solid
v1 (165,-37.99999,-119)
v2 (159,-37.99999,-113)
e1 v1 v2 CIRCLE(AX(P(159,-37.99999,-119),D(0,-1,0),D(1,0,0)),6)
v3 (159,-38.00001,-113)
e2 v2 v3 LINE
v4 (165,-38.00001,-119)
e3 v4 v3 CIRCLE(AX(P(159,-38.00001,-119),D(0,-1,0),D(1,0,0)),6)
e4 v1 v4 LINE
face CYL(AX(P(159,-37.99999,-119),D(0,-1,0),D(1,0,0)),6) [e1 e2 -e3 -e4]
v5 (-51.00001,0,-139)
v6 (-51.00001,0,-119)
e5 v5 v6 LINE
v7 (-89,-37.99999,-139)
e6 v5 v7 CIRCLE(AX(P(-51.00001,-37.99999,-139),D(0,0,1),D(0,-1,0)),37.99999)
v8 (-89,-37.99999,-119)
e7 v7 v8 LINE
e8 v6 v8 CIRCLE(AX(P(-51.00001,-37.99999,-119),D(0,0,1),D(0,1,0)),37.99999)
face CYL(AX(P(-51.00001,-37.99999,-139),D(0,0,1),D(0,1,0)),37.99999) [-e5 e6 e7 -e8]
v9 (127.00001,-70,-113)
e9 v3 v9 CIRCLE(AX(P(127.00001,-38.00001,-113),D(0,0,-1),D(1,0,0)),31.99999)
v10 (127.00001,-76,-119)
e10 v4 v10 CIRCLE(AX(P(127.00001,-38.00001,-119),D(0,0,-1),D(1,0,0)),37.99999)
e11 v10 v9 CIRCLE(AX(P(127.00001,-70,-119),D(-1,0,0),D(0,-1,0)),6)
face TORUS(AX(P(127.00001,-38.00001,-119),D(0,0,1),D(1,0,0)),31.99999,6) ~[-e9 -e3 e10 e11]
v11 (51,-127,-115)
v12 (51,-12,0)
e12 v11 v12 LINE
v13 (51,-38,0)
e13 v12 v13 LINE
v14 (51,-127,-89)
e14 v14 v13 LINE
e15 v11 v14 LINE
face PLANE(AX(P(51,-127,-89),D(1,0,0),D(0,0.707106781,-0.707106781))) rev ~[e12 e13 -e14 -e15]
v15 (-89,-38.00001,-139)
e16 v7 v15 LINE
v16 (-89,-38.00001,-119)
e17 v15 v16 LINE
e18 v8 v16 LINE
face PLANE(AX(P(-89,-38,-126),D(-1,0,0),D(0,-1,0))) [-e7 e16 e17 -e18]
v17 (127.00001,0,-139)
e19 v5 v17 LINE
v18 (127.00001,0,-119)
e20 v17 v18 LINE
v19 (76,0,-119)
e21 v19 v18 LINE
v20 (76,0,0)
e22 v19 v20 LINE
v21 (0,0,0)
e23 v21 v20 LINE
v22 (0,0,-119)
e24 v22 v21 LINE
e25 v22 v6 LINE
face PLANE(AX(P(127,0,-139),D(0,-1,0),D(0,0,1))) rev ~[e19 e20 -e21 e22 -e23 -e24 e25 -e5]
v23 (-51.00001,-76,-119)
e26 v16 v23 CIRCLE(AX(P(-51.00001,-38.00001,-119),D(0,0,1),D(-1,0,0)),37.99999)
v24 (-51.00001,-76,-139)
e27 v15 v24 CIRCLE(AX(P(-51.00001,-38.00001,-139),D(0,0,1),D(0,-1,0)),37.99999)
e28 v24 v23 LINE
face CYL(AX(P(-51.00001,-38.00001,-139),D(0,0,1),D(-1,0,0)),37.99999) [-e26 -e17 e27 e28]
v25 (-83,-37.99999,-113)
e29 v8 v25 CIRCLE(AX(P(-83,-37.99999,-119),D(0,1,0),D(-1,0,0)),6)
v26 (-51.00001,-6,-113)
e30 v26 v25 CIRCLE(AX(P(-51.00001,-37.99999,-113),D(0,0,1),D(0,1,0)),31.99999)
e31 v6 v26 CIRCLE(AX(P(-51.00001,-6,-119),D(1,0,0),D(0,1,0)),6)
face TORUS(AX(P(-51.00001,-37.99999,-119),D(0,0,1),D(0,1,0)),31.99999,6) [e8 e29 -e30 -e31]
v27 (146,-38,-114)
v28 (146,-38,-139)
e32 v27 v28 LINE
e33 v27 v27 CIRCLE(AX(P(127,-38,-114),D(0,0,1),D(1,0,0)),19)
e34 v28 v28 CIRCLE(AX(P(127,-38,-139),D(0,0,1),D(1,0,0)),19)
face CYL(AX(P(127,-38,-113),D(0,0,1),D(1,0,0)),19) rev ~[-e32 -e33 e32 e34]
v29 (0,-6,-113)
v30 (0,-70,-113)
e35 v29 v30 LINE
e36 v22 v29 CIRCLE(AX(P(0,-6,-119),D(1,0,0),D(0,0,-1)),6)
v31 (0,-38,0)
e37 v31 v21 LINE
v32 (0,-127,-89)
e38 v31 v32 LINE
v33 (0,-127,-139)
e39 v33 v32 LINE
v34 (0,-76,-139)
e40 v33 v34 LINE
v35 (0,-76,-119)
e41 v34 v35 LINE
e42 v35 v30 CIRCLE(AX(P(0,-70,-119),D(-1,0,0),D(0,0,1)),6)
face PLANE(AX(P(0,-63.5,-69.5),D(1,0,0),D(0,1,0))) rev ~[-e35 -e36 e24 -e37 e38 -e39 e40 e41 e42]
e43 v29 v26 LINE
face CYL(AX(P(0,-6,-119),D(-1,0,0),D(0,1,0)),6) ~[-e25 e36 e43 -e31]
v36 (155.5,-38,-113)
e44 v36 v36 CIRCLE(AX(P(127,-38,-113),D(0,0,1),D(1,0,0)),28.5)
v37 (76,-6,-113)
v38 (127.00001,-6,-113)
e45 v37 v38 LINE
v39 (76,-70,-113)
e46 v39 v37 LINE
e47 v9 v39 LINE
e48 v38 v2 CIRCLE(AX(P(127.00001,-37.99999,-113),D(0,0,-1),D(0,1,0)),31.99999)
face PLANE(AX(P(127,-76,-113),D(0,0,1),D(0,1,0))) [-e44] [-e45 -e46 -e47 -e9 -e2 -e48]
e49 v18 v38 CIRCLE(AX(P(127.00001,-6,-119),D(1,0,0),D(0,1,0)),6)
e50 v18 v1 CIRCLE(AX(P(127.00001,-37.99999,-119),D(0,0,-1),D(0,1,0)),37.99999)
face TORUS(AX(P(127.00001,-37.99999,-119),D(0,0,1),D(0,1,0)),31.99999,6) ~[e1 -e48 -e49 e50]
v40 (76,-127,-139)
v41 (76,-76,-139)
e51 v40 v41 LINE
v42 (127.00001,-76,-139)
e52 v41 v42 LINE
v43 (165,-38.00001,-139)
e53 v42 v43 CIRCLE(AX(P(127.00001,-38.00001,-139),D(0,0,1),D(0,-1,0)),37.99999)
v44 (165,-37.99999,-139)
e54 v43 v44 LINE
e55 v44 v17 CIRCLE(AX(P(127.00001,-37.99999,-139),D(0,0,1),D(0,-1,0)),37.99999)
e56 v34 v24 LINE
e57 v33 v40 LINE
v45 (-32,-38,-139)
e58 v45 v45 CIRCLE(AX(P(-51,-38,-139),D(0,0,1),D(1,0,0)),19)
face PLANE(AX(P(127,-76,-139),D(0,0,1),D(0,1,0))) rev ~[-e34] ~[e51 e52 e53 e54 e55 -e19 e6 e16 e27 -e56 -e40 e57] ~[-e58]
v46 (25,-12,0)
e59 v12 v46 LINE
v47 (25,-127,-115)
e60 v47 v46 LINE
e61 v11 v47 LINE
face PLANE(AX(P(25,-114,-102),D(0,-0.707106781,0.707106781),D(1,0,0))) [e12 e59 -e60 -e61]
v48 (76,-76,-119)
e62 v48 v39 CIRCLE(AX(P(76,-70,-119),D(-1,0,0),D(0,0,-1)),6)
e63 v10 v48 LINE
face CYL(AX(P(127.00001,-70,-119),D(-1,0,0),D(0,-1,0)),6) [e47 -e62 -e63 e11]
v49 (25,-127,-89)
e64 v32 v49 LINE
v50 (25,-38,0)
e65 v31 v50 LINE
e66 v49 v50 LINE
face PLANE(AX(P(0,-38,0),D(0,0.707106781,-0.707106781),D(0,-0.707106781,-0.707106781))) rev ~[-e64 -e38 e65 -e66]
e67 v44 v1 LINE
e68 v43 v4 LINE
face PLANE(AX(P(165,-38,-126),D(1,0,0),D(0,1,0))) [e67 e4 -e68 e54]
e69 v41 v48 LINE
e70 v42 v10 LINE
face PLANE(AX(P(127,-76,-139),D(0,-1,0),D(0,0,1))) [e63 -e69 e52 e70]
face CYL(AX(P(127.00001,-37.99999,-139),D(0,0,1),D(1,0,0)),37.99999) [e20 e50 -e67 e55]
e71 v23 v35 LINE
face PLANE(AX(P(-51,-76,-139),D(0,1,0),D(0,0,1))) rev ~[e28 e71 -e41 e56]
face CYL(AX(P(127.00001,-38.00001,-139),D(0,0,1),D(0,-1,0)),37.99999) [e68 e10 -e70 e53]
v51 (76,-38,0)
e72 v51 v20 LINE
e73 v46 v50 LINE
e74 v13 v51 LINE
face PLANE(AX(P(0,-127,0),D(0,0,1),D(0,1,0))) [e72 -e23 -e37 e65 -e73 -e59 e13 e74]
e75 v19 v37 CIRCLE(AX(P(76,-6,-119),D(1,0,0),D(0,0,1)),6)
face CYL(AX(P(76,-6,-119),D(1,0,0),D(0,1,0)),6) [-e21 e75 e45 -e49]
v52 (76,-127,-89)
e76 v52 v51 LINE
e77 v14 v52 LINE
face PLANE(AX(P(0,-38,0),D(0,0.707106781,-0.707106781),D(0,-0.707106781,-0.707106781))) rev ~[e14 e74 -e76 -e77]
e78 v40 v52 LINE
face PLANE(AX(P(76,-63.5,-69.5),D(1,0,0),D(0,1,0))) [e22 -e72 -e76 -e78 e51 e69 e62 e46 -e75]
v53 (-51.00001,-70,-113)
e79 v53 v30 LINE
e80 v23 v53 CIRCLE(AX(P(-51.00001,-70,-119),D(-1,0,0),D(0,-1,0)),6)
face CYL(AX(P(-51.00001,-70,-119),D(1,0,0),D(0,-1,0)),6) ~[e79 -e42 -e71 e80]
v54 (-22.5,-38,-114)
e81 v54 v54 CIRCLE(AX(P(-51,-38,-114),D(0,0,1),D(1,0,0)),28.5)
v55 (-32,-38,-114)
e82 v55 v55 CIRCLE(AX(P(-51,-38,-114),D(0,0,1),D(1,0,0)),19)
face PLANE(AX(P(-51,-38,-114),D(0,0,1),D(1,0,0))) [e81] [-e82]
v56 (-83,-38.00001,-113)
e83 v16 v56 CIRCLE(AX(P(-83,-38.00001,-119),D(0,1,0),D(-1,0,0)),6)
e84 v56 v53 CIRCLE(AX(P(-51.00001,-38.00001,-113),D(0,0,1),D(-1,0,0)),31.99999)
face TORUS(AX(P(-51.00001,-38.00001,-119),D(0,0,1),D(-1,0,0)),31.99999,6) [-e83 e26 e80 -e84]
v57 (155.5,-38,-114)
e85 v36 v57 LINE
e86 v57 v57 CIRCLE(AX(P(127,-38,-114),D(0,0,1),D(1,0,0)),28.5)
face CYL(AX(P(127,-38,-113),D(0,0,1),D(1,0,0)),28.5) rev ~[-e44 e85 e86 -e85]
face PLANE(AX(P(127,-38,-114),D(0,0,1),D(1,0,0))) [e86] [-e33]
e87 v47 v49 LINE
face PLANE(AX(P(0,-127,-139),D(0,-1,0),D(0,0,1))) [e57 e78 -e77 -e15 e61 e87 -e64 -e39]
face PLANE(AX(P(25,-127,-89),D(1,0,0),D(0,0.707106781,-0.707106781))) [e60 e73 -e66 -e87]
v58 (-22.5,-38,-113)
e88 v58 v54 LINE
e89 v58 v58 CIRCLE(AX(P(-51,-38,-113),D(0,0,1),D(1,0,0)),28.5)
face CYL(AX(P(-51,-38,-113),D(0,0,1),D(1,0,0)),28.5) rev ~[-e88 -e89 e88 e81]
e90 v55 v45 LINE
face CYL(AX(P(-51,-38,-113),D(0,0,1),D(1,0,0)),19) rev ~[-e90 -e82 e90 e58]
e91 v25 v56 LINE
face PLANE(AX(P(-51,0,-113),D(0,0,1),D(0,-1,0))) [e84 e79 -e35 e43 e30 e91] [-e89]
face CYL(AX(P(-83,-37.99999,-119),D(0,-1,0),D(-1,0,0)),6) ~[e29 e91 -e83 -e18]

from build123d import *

# Parameters (mm, degrees)
F0_W      = 127
F0_H      = 139
F1_DEPTH  = 76
F3_W      = 76
F3_H      = 26
F4_DEPTH  = 51
F2_W      = 76
F2_H      = 26
F5_DEPTH  = 51
F6_DEPTH  = 38
F7_DEPTH  = 38
F8_R      = 19
F9_DEPTH  = 26.001
F10_R     = 37.99999
F11_R     = 28.5
F11_R_2   = 19
F13_DEPTH = 1
F12_R     = 28.5
F12_R_2   = 19
F14_DEPTH = 1
F15_R     = 6
F17_DEPTH = 165.001
F18_W     = 26
F18_H     = 125.8650070512
F21_DEPTH = 18.3847763109
F22_DEPTH = 26.8710576851
F23_DEPTH = 35.3563390593


# Not quite as in the source:
# - a fillet or chamfer is up to 0.001 mm smaller than in the source, because OpenCascade refuses the exact size


with BuildPart() as f1:
    # F0 (on Right) → F1 (new body)
    with BuildSketch(Plane.YZ):
        with Locations((-63.5, -69.5)):
            Rectangle(F0_W, F0_H)
    extrude(amount=F1_DEPTH)

    # F3 (on face) → F4 (join)
    with BuildSketch(Plane.YZ.offset(76)):
        with Locations((-38, -126)):
            Rectangle(F3_W, F3_H)
    extrude(amount=F4_DEPTH)

    # F2 (on face) → F5 (join)
    with BuildSketch(Plane(origin=(0, 0, 0), x_dir=(0, -1, 0), z_dir=(-1, 0, 0))):
        with Locations((38, -126)):
            Rectangle(F2_W, F2_H)
    extrude(amount=F5_DEPTH)

    # F6 (add): a face of the model
    f6_faces = [f1.faces().sort_by_distance(p)[0] for p in [
        (-51, -38, -126),
    ]]
    extrude(f6_faces, amount=F6_DEPTH)

    # F7 (add): a face of the model
    f7_faces = [f1.faces().sort_by_distance(p)[0] for p in [
        (127, -38, -126),
    ]]
    extrude(f7_faces, amount=F7_DEPTH)

    # F8 (on face) → F9 (cut, through all)
    with BuildSketch(Plane.XY.offset(-113)):
        with Locations((-51, -38)):
            Circle(F8_R)
        with Locations((127, -38)):
            Circle(F8_R)
    extrude(amount=-F9_DEPTH, mode=Mode.SUBTRACT)

    # F10 (radius 38 in the source; OpenCascade refuses exactly that, so slightly less here)
    f10_edges = [f1.edges().sort_by_distance(p)[0] for p in [
        (-89, 0, -126),
        (-89, -76, -126),
        (165, -76, -126),
        (165, 0, -126),
    ]]
    fillet(f10_edges, radius=F10_R)

    # F11 (on face) → F13 (cut)
    with BuildSketch(Plane.XY.offset(-113)):
        with Locations((-51, -38)):
            Circle(F11_R)
        with Locations((-51, -38)):
            Circle(F11_R_2, mode=Mode.SUBTRACT)
    extrude(amount=-F13_DEPTH, mode=Mode.SUBTRACT)

    # F12 (on face) → F14 (cut)
    with BuildSketch(Plane.XY.offset(-113)):
        with Locations((127, -38)):
            Circle(F12_R)
        with Locations((127, -38)):
            Circle(F12_R_2, mode=Mode.SUBTRACT)
    extrude(amount=-F14_DEPTH, mode=Mode.SUBTRACT)

    # F15
    f15_edges = [f1.edges().sort_by_distance(p)[0] for p in [
        (-25.500005, -76, -113),
        (-77.870061, -11.129939, -113),
        (101.500005, -76, -113),
    ]]
    fillet(f15_edges, radius=F15_R)

    # F16 (on face) → F17 (cut, through all)
    with BuildSketch(Plane(origin=(0, 0, 0), x_dir=(0, -1, 0), z_dir=(-1, 0, 0))):
        Polygon((127, 0), (38, 0), (127, -89), align=None)
    extrude(amount=-F17_DEPTH, mode=Mode.SUBTRACT)

    # F18 (on face) → F21 (cut, through all)
    with BuildSketch(Plane(origin=(0, -19, 19), x_dir=(1, 0, 0), z_dir=(0, -0.7071067812, 0.7071067812))):
        with Locations((38, -89.8025612107)):
            Rectangle(F18_W, F18_H)
    extrude(amount=-F21_DEPTH, mode=Mode.SUBTRACT)

    # F22 (cut, through all): a face of the model
    f22_faces = [f1.faces().sort_by_distance(p)[0] for p in [
        (38, -31.5, -6.5),
    ]]
    extrude(f22_faces, amount=-F22_DEPTH, mode=Mode.SUBTRACT)

    # F23 (cut, through all): a face of the model
    f23_faces = [f1.faces().sort_by_distance(p)[0] for p in [
        (38, -120.5, -95.5),
    ]]
    extrude(f23_faces, amount=-F23_DEPTH, mode=Mode.SUBTRACT)


solid = f1.part
